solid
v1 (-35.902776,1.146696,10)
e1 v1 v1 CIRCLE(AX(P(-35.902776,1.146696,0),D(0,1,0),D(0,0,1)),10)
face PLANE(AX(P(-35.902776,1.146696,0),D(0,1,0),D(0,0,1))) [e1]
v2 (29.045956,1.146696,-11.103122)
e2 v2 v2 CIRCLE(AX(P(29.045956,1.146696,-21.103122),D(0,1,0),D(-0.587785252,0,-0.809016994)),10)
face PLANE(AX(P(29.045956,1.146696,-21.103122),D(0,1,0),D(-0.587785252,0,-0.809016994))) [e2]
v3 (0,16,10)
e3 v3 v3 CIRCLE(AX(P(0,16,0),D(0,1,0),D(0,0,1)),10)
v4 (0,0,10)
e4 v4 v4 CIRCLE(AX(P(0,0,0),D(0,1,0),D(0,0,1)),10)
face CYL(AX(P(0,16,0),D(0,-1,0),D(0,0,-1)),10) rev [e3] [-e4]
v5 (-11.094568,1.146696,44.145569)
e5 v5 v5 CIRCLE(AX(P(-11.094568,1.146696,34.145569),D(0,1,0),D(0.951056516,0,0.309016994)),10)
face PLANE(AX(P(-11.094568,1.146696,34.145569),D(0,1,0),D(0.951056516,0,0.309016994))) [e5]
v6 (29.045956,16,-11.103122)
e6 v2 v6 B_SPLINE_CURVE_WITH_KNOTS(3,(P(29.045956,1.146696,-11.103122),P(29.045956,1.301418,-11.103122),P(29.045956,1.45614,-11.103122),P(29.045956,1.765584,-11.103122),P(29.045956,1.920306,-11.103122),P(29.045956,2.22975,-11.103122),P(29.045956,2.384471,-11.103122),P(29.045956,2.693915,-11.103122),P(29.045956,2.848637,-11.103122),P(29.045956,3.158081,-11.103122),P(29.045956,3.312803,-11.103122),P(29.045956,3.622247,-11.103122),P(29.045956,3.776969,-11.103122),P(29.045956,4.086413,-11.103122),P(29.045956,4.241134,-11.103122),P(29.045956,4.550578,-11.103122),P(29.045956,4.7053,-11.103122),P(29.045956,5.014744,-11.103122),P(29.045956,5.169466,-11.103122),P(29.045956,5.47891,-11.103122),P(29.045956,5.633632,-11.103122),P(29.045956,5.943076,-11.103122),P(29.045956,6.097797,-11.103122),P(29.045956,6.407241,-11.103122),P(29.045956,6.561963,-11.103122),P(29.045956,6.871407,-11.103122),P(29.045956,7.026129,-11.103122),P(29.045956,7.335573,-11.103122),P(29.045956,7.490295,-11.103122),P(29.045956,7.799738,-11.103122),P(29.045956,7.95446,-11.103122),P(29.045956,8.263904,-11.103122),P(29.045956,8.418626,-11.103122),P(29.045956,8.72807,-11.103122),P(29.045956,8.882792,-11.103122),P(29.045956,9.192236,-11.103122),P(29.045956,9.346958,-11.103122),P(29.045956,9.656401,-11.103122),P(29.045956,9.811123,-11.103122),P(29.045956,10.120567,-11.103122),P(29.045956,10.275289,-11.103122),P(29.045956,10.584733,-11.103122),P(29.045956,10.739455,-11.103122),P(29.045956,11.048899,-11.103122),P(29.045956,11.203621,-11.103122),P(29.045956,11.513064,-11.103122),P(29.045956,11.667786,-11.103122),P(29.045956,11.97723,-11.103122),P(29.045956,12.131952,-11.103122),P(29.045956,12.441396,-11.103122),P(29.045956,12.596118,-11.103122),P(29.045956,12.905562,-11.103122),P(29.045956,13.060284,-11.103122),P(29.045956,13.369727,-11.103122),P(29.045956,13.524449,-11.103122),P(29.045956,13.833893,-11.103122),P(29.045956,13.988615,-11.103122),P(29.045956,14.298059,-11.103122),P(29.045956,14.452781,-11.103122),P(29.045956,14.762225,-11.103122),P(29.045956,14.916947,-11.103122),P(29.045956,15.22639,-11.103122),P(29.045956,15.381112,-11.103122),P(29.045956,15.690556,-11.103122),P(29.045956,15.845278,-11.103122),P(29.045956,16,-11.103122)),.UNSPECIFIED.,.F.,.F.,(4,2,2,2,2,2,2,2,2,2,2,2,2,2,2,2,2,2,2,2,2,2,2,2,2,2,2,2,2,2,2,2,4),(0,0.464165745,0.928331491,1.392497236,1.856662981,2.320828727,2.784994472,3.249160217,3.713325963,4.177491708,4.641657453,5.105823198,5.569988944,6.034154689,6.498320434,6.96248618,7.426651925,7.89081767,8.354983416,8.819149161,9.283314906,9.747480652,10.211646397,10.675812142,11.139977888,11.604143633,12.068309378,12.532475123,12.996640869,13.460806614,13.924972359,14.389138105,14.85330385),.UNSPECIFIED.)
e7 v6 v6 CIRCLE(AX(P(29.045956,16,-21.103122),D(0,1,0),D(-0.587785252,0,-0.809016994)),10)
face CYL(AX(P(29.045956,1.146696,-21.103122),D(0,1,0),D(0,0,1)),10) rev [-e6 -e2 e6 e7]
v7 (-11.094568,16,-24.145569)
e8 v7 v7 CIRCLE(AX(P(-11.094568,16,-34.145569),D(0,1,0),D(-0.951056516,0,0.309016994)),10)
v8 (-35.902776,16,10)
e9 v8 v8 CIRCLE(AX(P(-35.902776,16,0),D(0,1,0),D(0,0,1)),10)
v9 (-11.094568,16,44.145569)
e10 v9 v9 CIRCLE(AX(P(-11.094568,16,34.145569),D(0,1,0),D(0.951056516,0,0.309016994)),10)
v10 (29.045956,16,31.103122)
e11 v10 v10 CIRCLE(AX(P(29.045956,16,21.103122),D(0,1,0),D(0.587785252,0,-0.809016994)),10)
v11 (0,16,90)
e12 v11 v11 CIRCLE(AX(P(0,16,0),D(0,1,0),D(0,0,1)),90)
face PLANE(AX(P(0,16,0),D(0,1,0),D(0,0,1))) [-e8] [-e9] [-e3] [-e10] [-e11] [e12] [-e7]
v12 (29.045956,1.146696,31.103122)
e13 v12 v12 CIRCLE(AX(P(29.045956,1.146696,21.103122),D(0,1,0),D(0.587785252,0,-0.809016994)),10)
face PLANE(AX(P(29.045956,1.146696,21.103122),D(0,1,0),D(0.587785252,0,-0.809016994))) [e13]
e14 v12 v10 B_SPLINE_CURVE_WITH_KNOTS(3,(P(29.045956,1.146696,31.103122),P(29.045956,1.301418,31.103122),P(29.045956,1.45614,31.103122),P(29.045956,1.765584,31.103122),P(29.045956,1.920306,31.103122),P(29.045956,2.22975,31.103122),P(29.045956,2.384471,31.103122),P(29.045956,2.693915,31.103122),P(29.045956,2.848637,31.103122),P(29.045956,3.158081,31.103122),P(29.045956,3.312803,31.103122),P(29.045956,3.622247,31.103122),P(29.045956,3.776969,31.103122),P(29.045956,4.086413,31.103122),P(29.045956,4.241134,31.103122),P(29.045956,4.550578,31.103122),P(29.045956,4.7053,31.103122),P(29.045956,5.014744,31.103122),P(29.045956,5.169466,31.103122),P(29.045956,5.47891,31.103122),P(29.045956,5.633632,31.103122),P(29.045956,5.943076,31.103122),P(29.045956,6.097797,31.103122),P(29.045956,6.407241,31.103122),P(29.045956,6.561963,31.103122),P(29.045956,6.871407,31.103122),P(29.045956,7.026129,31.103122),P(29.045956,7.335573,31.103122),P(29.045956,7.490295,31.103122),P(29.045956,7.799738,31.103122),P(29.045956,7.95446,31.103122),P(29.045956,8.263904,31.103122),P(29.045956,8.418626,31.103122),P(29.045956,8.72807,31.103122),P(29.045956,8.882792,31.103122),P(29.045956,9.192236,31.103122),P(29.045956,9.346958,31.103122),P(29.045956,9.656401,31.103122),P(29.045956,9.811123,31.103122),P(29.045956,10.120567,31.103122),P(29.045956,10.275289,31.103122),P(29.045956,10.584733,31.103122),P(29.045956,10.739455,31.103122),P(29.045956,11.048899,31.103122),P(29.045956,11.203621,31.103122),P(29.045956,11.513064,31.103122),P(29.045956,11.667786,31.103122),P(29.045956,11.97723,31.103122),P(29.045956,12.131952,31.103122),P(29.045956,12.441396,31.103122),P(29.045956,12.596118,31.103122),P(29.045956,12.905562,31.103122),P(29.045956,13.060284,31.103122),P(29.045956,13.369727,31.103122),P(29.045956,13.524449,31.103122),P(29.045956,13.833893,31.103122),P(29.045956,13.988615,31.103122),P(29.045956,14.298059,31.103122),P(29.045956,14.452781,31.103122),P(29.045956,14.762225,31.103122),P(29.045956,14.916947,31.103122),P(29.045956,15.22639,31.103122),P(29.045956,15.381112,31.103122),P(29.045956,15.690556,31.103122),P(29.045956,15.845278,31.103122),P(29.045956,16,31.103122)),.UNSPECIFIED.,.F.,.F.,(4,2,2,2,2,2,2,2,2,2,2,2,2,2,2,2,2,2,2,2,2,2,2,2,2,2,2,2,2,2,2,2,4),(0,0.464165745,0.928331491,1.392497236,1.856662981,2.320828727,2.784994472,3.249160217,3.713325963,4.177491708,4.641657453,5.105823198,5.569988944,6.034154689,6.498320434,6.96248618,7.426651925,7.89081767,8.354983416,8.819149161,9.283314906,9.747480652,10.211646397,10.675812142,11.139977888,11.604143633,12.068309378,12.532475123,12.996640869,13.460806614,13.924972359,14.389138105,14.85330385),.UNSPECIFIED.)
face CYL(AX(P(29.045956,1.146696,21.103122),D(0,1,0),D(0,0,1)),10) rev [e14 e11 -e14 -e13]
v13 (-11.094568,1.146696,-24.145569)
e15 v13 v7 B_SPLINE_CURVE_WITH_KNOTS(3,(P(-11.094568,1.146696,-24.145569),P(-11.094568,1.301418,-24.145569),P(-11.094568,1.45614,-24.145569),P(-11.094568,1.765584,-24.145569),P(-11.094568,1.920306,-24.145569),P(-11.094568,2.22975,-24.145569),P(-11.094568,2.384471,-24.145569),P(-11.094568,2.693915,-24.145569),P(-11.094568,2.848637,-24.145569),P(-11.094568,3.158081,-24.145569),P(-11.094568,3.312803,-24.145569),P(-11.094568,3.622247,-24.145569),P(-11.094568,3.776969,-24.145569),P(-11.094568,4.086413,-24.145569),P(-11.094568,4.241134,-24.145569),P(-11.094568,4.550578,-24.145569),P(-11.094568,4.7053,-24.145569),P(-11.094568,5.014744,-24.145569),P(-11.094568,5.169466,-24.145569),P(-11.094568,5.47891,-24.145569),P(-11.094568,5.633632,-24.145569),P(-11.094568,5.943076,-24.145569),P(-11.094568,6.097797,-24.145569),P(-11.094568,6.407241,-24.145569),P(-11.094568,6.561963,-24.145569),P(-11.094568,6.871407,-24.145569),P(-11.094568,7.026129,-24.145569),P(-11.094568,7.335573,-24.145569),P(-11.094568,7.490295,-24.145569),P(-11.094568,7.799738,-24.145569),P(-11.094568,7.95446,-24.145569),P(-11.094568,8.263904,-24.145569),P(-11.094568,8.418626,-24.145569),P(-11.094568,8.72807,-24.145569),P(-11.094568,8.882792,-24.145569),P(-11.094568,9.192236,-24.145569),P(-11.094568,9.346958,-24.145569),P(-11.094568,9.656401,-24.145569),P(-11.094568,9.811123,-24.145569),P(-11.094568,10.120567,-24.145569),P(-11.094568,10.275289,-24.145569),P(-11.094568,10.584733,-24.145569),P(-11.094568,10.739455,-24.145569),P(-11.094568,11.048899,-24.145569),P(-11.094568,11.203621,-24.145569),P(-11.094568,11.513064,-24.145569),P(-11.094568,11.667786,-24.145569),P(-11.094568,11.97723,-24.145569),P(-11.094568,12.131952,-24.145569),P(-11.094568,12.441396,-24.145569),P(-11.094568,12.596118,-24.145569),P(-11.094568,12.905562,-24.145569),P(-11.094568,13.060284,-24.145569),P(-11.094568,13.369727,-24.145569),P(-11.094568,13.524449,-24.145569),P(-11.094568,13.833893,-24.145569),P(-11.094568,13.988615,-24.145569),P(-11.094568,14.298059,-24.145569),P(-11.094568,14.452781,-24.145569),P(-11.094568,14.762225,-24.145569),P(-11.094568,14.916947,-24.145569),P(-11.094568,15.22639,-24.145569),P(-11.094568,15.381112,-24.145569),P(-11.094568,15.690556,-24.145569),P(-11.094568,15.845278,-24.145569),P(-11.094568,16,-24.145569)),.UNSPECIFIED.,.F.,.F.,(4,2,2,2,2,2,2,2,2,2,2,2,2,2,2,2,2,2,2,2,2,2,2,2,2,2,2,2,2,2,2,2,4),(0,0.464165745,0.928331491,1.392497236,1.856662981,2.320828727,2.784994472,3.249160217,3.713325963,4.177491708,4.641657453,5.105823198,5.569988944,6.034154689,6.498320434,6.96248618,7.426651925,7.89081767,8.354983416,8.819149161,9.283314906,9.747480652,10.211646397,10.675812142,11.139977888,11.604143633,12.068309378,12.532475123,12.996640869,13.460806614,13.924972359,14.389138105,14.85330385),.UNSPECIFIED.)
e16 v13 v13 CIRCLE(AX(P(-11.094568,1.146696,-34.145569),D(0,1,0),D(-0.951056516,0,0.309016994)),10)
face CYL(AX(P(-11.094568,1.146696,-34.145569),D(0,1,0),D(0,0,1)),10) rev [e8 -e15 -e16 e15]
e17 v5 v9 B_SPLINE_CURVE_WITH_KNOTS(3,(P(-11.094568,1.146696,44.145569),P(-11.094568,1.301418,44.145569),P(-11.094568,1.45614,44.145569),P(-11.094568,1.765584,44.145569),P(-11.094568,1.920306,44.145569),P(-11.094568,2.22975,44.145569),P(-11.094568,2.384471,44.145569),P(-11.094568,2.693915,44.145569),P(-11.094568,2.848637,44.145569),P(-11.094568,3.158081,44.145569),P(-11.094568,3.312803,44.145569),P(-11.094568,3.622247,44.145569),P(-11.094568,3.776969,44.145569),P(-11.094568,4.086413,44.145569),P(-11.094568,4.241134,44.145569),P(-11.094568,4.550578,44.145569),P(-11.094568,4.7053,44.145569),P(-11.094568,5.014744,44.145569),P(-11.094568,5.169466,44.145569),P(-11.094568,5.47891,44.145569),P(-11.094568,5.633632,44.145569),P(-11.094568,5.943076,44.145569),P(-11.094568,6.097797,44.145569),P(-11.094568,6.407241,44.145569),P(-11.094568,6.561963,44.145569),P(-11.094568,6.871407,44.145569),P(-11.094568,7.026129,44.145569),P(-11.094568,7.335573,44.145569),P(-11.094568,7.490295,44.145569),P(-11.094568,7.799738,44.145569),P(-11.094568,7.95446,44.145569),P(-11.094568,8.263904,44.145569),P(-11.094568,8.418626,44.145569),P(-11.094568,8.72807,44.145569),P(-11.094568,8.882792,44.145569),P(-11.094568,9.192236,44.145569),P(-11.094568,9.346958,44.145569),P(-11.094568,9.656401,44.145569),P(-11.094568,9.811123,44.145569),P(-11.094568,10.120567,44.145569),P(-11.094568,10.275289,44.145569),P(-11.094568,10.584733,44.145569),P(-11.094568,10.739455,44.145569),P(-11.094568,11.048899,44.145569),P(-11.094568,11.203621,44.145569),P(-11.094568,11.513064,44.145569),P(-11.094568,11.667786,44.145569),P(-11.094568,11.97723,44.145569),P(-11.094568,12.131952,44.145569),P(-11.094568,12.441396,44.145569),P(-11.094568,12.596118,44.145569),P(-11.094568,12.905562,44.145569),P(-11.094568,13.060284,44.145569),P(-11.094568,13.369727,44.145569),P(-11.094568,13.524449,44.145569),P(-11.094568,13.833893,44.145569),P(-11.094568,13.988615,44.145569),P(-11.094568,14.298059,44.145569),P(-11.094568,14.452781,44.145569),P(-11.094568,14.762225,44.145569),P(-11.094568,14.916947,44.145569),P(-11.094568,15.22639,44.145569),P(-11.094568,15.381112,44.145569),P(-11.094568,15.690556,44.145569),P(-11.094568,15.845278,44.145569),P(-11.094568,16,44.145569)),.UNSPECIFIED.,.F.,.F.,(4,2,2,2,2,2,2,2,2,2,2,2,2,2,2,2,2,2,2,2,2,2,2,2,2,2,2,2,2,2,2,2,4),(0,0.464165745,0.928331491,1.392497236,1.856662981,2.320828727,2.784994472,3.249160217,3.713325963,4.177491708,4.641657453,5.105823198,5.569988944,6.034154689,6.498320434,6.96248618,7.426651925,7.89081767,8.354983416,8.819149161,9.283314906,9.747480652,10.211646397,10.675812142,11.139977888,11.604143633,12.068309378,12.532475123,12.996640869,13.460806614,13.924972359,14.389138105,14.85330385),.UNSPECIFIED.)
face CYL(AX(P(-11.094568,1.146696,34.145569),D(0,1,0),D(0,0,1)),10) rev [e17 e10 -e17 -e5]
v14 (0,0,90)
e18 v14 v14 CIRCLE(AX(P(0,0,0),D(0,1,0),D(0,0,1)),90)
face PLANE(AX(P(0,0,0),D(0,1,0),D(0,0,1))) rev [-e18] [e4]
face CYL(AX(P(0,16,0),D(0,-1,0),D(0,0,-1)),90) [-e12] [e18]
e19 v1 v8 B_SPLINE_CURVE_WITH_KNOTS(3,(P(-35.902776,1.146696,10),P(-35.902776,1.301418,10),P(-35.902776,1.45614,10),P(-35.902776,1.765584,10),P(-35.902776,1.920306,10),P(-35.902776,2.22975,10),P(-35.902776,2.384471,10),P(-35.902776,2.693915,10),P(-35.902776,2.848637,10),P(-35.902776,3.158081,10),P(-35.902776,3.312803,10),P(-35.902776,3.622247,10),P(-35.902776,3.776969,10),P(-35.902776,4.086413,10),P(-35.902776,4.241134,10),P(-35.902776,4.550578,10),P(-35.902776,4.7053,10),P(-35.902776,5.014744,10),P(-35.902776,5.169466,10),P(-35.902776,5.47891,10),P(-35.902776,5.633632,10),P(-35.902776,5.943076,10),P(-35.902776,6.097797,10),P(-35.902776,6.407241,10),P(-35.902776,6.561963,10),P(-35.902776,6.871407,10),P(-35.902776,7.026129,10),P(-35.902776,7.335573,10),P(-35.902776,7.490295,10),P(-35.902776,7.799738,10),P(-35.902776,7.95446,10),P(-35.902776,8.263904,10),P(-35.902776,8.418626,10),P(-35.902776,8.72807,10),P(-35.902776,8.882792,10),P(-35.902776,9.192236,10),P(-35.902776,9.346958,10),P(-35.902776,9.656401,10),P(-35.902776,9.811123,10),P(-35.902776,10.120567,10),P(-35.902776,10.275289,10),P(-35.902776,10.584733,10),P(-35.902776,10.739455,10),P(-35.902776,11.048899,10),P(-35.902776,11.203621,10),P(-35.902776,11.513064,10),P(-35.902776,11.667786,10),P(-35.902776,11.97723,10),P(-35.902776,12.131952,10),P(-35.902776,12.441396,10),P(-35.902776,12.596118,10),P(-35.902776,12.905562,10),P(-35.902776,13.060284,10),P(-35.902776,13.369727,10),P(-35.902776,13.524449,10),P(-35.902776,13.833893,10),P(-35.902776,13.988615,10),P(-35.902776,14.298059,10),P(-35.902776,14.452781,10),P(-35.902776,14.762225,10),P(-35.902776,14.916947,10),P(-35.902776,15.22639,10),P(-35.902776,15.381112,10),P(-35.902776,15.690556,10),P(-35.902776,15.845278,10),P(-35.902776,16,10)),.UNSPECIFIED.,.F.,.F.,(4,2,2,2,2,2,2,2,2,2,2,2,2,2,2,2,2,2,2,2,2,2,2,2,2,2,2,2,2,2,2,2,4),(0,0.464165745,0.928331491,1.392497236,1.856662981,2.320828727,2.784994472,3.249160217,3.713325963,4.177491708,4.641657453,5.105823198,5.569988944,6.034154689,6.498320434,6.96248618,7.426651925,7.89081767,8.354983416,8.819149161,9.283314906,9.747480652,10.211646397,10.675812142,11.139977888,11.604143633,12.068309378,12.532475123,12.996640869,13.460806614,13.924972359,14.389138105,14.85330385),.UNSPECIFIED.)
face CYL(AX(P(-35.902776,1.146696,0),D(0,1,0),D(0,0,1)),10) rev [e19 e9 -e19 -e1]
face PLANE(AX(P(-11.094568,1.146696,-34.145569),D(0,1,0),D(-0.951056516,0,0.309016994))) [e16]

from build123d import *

# Parameters (mm, degrees)
SKETCH1_R           = 90
BOSS_EXTRUDE1_DEPTH = 16
SKETCH2_R           = 10
CUT_EXTRUDE1_DEPTH  = 129.280941687
SKETCH3_R           = 10
CUT_EXTRUDE2_DEPTH  = 14.85330385
CIRPATTERN1_COUNT   = 5


with BuildPart() as part:
    # Sketch1 → Boss-Extrude1 (new body)
    with BuildSketch(Plane(origin=(0, 0, 0), x_dir=(1, 0, 0), z_dir=(0, 1, 0))):
        Circle(SKETCH1_R)
    extrude(amount=BOSS_EXTRUDE1_DEPTH)

    # Sketch2 → Cut-Extrude1 (cut, through all)
    with BuildSketch(Plane(origin=(0, 0, 0), x_dir=(1, 0, 0), z_dir=(0, 1, 0))):
        Circle(SKETCH2_R)
    extrude(amount=CUT_EXTRUDE1_DEPTH, mode=Mode.SUBTRACT)

    # Sketch3 → Cut-Extrude2 (cut)
    with BuildSketch(Plane(origin=(0, 16, 0), x_dir=(1, 0, 0), z_dir=(0, 1, 0))):
        with Locations((-35.902775508, 0)):
            Circle(SKETCH3_R)
    cut_extrude2 = extrude(amount=-CUT_EXTRUDE2_DEPTH, mode=Mode.SUBTRACT)

    # CirPattern1: Cut-Extrude2 ×5 about axis
    cirpattern1_axis = Axis((0, 0, 0), (0, 1, 0))
    for i in range(1, CIRPATTERN1_COUNT):
        add(cut_extrude2.rotate(cirpattern1_axis, i * 360 / CIRPATTERN1_COUNT), mode=Mode.SUBTRACT)


solid = part.part
